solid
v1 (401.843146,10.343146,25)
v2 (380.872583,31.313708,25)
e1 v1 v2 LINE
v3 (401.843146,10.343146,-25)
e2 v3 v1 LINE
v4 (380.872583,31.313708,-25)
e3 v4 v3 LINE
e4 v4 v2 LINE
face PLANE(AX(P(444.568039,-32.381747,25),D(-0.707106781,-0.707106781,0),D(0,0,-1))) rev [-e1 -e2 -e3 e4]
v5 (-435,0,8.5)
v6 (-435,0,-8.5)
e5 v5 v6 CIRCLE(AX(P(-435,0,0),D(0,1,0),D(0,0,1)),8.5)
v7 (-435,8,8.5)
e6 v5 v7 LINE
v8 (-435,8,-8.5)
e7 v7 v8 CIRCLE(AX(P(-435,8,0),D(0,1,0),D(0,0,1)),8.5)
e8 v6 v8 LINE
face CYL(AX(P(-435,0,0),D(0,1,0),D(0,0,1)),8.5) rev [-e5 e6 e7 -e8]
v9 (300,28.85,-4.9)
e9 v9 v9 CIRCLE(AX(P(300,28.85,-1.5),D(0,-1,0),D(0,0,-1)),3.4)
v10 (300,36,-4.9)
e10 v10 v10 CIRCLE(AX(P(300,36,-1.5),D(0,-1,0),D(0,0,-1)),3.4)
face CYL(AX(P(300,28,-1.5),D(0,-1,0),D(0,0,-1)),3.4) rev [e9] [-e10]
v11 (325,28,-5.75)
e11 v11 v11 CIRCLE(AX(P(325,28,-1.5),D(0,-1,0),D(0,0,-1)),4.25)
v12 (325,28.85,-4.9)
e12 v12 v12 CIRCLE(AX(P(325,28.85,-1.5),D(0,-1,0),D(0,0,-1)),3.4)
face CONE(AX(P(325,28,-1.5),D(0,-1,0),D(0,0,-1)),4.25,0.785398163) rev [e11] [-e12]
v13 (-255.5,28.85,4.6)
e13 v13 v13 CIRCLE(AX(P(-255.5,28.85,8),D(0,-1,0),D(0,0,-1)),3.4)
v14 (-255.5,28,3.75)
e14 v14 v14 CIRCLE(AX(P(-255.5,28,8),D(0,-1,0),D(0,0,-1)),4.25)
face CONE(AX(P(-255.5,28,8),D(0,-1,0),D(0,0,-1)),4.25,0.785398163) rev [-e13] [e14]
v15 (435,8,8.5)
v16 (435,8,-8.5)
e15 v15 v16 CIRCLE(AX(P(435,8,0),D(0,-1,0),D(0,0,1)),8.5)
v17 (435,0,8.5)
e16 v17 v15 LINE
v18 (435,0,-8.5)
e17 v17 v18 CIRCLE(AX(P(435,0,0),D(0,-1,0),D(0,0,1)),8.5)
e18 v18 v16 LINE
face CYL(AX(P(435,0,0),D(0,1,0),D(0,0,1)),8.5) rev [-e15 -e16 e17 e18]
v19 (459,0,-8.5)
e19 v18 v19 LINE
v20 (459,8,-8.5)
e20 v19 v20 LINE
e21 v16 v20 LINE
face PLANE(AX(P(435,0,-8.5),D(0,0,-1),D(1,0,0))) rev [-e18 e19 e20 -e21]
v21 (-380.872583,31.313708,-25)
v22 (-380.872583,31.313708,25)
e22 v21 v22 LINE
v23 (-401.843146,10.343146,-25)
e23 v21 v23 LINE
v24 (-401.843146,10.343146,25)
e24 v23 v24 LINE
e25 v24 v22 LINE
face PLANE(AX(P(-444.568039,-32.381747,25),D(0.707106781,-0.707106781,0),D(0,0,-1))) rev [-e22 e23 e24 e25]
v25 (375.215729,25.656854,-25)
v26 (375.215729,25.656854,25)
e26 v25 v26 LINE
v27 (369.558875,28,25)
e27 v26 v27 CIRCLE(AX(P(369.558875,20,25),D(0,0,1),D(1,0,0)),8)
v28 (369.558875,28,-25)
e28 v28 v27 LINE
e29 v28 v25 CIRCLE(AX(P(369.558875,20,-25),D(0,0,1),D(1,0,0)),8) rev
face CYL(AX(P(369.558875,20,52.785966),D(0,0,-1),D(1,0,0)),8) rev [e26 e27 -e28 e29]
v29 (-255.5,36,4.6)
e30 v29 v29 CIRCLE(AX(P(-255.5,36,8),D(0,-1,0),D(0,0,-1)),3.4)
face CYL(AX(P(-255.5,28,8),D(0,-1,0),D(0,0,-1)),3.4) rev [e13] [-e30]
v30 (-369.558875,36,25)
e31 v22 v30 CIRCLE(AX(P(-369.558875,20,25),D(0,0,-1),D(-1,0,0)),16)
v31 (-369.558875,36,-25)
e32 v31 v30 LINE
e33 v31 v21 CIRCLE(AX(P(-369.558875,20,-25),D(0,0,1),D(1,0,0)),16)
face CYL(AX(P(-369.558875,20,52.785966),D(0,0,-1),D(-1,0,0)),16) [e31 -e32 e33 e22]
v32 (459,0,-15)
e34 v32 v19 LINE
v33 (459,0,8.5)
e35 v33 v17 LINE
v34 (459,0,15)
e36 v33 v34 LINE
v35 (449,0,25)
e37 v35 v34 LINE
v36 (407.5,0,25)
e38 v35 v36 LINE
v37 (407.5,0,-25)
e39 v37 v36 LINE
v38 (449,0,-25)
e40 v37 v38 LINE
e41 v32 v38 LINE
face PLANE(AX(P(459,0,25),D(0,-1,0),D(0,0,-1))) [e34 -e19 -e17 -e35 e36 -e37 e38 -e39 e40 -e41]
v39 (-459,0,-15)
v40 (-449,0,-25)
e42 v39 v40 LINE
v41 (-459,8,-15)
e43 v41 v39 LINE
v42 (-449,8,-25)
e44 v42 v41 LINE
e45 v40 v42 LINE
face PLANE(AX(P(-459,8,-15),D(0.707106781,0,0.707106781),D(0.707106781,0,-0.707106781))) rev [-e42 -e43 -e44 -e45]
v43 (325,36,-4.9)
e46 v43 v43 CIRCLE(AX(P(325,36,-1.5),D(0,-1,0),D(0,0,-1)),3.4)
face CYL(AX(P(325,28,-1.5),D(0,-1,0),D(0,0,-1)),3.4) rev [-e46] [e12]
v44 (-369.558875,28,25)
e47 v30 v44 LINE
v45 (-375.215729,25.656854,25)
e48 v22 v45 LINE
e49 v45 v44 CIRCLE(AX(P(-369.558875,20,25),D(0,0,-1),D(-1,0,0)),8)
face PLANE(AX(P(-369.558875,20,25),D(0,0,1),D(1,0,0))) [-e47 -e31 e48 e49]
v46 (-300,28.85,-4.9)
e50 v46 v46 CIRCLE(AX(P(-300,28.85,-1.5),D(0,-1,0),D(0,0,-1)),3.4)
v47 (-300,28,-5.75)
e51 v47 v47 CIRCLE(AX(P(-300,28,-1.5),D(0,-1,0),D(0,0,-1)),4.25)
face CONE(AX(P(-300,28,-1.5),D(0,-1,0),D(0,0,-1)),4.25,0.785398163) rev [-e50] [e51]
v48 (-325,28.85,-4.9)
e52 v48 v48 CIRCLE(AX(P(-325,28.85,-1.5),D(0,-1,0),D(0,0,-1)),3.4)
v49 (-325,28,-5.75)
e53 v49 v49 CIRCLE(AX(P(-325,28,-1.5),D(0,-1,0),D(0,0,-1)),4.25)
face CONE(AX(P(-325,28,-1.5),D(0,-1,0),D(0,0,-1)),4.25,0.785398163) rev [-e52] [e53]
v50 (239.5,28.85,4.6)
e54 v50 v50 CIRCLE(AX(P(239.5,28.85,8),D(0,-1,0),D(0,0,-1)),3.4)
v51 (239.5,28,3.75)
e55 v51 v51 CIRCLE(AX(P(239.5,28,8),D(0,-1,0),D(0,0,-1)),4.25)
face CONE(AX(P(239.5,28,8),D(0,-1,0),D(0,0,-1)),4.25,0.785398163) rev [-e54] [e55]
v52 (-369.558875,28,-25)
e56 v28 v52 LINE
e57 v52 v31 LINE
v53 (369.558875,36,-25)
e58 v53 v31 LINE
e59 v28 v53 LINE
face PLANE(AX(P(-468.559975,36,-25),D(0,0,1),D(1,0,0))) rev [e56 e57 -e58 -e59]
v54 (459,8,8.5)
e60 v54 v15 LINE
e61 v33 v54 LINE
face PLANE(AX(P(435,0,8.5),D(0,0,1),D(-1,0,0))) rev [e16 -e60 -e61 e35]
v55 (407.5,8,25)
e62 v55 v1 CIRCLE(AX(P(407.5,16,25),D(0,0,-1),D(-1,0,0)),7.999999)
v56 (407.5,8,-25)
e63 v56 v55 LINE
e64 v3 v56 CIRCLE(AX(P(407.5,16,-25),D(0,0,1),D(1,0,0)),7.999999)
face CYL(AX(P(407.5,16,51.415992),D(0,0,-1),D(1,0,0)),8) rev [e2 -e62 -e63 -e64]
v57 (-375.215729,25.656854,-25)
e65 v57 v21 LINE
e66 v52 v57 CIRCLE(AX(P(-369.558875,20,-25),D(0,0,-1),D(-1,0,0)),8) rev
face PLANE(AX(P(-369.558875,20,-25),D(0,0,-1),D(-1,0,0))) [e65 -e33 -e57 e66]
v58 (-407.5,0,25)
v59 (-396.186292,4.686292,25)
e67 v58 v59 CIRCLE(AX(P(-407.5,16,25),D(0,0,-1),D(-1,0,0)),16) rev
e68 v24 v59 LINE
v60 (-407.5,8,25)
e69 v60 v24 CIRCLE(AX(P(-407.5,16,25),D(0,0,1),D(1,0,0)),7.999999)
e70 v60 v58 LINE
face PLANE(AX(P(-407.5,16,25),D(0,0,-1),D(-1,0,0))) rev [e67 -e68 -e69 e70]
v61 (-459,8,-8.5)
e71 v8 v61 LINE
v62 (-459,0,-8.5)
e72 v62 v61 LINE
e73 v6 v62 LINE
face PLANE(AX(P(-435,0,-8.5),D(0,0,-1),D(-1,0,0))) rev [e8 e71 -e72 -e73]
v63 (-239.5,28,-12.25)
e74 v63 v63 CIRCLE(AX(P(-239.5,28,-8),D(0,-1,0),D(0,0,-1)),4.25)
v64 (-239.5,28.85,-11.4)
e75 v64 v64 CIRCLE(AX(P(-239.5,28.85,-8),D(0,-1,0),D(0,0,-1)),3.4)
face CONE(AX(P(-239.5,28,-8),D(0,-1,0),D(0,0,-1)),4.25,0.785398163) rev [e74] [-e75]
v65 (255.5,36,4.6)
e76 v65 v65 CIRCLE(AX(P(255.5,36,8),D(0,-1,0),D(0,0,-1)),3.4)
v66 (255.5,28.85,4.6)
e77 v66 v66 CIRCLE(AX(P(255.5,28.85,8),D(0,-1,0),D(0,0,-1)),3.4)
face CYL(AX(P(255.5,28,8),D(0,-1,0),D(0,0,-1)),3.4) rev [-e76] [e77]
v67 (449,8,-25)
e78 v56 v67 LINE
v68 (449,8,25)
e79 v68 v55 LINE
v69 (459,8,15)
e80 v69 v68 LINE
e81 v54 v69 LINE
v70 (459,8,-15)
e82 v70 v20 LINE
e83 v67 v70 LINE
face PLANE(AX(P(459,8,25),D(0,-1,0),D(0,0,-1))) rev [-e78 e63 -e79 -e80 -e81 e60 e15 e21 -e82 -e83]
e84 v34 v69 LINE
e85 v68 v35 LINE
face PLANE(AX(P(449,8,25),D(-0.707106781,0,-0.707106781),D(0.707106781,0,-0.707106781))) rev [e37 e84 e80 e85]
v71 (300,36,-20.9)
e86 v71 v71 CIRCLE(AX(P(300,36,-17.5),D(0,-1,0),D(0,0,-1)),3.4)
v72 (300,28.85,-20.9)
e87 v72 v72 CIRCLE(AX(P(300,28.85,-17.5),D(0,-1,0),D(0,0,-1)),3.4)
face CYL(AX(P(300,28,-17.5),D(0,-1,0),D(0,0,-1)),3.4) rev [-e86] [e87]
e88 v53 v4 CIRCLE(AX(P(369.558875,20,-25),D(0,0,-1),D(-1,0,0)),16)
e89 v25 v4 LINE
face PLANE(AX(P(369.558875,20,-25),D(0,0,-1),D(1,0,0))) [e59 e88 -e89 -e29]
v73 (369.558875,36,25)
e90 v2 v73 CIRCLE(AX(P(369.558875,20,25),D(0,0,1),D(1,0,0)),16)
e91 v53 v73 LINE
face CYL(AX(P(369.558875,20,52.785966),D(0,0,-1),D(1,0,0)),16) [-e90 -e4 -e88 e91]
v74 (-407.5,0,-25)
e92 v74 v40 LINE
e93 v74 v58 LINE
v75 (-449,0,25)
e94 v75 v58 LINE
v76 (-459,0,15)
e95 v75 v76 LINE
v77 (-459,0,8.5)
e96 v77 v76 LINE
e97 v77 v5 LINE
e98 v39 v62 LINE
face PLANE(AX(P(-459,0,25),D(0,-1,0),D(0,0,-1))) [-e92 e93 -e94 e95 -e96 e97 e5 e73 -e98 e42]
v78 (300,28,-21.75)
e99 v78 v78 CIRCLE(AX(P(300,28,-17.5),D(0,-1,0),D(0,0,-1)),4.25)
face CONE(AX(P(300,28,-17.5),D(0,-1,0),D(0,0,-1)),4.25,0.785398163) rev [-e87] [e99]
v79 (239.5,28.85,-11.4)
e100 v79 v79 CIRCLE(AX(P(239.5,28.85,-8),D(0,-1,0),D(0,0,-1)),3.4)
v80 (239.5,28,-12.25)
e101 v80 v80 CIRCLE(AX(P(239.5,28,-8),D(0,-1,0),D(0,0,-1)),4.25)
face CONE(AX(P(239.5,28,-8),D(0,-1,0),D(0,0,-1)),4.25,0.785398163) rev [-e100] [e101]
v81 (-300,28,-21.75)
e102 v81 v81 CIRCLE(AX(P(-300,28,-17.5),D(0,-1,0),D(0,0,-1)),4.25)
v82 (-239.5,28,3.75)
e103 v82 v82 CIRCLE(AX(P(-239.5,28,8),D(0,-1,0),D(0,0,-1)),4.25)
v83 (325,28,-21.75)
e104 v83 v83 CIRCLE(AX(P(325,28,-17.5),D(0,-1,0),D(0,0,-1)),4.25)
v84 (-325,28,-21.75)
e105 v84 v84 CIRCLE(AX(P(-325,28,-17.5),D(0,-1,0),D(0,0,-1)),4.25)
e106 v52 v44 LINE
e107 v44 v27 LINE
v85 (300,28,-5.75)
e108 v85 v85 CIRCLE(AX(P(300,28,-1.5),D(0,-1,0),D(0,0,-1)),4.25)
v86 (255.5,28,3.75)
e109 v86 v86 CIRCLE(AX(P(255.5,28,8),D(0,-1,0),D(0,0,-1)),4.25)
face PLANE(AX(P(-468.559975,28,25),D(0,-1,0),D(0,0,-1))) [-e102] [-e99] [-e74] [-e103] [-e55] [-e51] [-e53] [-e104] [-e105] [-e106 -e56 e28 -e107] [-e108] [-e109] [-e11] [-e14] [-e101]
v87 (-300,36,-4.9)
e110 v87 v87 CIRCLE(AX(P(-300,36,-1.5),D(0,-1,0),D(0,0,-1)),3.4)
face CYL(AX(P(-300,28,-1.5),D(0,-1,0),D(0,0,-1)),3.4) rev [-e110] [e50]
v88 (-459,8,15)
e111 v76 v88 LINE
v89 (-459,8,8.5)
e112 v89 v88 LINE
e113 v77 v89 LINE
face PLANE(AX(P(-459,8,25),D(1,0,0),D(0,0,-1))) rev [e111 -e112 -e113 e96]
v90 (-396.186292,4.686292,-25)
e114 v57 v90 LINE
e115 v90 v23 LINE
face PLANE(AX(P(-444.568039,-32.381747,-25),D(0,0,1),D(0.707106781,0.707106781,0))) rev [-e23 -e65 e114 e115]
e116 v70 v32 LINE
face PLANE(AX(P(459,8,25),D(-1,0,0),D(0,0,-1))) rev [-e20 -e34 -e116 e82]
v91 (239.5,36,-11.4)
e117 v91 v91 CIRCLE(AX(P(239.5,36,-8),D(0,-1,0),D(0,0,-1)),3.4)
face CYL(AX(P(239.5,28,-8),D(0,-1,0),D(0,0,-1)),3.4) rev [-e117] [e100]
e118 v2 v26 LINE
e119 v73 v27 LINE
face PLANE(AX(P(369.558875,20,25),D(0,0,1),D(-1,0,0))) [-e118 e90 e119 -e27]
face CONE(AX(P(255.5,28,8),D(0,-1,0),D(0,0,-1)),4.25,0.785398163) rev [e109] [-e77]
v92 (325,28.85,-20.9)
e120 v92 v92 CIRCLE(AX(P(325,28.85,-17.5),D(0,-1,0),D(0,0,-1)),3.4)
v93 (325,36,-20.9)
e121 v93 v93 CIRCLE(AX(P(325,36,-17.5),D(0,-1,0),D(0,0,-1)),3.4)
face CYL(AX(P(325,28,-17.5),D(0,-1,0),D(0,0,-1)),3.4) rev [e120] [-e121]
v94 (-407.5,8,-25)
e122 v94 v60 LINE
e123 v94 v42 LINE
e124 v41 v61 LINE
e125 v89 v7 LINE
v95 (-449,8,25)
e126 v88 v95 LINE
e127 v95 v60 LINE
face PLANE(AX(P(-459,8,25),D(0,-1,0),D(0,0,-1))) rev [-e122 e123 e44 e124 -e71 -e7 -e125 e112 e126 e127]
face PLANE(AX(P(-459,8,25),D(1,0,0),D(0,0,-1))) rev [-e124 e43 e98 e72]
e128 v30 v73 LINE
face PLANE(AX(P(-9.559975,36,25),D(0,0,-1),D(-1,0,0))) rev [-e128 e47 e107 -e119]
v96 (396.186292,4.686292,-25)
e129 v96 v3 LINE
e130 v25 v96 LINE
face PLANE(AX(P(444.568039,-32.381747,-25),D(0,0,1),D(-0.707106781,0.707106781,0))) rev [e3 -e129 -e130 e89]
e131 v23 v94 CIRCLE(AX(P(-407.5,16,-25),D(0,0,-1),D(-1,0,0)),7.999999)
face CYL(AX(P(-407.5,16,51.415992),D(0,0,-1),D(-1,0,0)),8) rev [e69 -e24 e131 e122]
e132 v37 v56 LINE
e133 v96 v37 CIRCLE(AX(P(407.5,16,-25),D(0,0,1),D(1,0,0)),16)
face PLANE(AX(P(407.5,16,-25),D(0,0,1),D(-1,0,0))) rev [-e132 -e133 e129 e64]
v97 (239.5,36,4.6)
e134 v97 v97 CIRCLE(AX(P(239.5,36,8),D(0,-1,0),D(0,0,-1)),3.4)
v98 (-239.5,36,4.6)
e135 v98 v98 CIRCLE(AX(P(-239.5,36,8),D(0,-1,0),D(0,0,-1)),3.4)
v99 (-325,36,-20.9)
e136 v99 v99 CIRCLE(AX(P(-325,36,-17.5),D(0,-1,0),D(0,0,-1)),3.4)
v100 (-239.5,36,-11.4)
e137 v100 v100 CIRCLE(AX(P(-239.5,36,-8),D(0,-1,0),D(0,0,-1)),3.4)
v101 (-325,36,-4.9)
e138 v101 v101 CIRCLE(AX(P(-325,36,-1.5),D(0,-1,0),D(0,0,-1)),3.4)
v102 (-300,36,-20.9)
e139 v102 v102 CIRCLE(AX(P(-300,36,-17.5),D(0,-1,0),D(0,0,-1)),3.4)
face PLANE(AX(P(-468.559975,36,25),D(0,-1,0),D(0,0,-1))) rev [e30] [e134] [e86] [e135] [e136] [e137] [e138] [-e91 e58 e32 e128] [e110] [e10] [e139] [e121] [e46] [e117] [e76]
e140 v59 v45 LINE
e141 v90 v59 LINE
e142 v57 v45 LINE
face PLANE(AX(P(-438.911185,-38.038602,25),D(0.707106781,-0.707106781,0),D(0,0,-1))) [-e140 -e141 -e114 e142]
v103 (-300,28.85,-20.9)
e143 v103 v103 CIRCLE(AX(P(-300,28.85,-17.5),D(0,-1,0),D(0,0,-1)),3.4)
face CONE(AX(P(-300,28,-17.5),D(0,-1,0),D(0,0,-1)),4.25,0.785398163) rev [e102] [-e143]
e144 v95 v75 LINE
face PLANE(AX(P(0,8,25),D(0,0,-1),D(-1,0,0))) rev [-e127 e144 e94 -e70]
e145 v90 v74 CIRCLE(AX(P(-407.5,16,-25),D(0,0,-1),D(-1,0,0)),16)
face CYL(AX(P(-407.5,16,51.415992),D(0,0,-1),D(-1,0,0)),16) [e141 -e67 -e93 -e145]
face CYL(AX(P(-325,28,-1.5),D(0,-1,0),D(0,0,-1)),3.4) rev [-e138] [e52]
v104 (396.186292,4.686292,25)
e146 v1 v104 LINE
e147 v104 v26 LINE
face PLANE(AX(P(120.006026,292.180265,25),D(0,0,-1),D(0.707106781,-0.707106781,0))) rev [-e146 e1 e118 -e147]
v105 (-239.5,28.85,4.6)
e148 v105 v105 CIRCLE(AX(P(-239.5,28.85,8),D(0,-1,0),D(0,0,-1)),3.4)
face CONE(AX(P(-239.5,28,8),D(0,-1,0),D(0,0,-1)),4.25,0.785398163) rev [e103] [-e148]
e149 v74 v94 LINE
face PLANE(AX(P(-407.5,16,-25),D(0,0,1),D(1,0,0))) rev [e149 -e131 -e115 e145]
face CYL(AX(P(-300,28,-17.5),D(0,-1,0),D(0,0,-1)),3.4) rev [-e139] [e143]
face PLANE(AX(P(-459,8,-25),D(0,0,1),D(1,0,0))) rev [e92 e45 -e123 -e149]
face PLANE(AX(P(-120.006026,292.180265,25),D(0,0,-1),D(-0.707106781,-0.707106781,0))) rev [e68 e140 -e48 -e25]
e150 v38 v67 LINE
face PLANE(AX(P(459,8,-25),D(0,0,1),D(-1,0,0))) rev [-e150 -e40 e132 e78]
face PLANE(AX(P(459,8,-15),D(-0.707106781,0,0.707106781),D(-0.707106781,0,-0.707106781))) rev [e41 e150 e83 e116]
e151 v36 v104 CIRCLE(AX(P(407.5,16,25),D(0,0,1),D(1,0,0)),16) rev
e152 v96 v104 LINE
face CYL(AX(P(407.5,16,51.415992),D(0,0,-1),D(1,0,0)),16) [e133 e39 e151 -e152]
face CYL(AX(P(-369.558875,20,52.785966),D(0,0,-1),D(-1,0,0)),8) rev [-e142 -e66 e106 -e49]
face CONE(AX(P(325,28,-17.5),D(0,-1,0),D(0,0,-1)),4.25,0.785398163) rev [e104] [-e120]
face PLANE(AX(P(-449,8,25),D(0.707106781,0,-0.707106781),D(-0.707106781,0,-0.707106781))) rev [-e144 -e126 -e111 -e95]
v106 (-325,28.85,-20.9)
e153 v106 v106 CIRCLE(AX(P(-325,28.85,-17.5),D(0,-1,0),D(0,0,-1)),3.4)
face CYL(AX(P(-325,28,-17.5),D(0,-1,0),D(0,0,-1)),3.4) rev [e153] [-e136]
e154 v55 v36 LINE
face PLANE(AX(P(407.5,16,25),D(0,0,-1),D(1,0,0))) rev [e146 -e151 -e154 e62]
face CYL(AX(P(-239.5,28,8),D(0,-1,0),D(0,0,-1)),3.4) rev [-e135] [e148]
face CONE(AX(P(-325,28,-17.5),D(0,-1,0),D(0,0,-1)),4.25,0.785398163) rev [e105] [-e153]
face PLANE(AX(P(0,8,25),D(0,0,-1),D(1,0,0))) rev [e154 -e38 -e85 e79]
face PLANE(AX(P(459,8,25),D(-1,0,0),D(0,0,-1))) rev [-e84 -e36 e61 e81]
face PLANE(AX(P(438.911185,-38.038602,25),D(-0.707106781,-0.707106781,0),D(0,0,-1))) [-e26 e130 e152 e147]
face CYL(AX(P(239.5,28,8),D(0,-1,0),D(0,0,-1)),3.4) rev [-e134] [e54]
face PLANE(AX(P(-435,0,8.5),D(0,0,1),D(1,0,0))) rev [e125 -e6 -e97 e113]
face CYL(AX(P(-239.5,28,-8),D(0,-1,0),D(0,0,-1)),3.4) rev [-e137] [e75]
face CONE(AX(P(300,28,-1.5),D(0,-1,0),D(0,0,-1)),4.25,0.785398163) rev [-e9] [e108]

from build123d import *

# Parameters (mm, degrees)
SKETCH_1_W             = 459
SKETCH_1_H             = 50
SM_BASE_FLANGE_1_DEPTH = 8
OTHER_START            = -25
OTHER_1_DEPTH          = 50
OTHER_1_2_DEPTH        = 50
CHAMFER_1_SIZE         = 10
CUT_EXTRUDE_1_DEPTH    = 461.532300713
M8X1_251_D             = 6.8
M8X1_251_CSINK_D       = 8.5
M8X1_251_CSINK_ANGLE   = 90


# Read off the part's stored shape, not the designer's step: Изгиб1
# Sheet-metal steps are written as plain solids
with BuildPart() as part:
    # Sketch 1 → Базовая кромка1 (new body)
    with BuildSketch(Plane(origin=(0, 0, 0), x_dir=(1, 0, 0), z_dir=(0, 1, 0))):
        with Locations((-229.5, 0)):
            Rectangle(SKETCH_1_W, SKETCH_1_H)
    extrude(amount=SM_BASE_FLANGE_1_DEPTH)

    # Other 1 outline → Other 1 (cut)
    with BuildSketch(Plane.XY.offset(OTHER_START)):
        with BuildLine():
            Line((-392.872583002, 8), (-396.186291703, 4.686291703))
            ThreePointArc((-396.186291703, 4.686291703), (-401.377065191, 1.217927743), (-407.5, 2.85e-07))
            Line((-407.5, 2.85e-07), (0, 0))
            Line((0, 0), (0, 8))
            Line((0, 8), (-392.872583002, 8))
        make_face()
    extrude(amount=OTHER_1_DEPTH, mode=Mode.SUBTRACT)

    # Other 1 2 outline → Other 1 2 (add)
    with BuildSketch(Plane.XY.offset(OTHER_START)):
        with BuildLine():
            Line((-407.5, 8.000000285), (-392.872583002, 8))
            Line((-392.872583002, 8), (-375.21572863, 25.656854127))
            ThreePointArc((-375.21572863, 25.656854127), (-372.620341896, 27.3910361), (-369.558874503, 27.999999827))
            Line((-369.558874503, 27.999999827), (0, 28))
            Line((0, 28), (0, 36))
            Line((0, 36), (-369.558874503, 35.999999827))
            ThreePointArc((-369.558874503, 35.999999827), (-375.681809355, 34.78207236), (-380.87258288, 31.313708377))
            Line((-380.87258288, 31.313708377), (-401.843145952, 10.343145952))
            ThreePointArc((-401.843145952, 10.343145952), (-404.43853265, 8.608964003), (-407.5, 8.000000285))
        make_face()
    extrude(amount=OTHER_1_2_DEPTH)

    # Фаска1
    chamfer_1_edges = [part.edges().sort_by_distance(p)[0] for p in [
        (-459, 4, -25),
        (-459, 4, 25),
    ]]
    chamfer(chamfer_1_edges, length=CHAMFER_1_SIZE)

    # Эскиз4 → Вытянуть1 (cut, through all)
    with BuildSketch(Plane(origin=(0, 8, 0), x_dir=(1, 0, 0), z_dir=(0, 1, 0))):
        with BuildLine():
            Line((-435, 8.5), (-459, 8.5))
            Line((-459, 8.5), (-459, -8.5))
            Line((-459, -8.5), (-435, -8.5))
            ThreePointArc((-435, -8.5), (-426.5, 0), (-435, 8.5))
        make_face()
    extrude(amount=-CUT_EXTRUDE_1_DEPTH, mode=Mode.SUBTRACT)

    # Зеркальное отражение1: part across plane


with BuildPart() as part_1:
    add(part.part)
    add(part.part.mirror(Plane(origin=(0, 36, -25), x_dir=(0, 0, 1), z_dir=(-1, 0, 0))))

    # Отверстие обработанное метчиком M8x1.251 (through all)
    with Locations(Plane.XZ.offset(-28)):
        with Locations((-325, -1.5), (-300, -1.5), (-300, -17.5), (-325, -17.5), (300, -1.5), (325, -1.5), (325, -17.5), (300, -17.5), (-255.5, 8), (-239.5, -8), (-239.5, 8), (239.5, 8), (239.5, -8), (255.5, 8)):
            CounterSinkHole(M8X1_251_D / 2, M8X1_251_CSINK_D / 2, counter_sink_angle=M8X1_251_CSINK_ANGLE)


solid = part_1.part
